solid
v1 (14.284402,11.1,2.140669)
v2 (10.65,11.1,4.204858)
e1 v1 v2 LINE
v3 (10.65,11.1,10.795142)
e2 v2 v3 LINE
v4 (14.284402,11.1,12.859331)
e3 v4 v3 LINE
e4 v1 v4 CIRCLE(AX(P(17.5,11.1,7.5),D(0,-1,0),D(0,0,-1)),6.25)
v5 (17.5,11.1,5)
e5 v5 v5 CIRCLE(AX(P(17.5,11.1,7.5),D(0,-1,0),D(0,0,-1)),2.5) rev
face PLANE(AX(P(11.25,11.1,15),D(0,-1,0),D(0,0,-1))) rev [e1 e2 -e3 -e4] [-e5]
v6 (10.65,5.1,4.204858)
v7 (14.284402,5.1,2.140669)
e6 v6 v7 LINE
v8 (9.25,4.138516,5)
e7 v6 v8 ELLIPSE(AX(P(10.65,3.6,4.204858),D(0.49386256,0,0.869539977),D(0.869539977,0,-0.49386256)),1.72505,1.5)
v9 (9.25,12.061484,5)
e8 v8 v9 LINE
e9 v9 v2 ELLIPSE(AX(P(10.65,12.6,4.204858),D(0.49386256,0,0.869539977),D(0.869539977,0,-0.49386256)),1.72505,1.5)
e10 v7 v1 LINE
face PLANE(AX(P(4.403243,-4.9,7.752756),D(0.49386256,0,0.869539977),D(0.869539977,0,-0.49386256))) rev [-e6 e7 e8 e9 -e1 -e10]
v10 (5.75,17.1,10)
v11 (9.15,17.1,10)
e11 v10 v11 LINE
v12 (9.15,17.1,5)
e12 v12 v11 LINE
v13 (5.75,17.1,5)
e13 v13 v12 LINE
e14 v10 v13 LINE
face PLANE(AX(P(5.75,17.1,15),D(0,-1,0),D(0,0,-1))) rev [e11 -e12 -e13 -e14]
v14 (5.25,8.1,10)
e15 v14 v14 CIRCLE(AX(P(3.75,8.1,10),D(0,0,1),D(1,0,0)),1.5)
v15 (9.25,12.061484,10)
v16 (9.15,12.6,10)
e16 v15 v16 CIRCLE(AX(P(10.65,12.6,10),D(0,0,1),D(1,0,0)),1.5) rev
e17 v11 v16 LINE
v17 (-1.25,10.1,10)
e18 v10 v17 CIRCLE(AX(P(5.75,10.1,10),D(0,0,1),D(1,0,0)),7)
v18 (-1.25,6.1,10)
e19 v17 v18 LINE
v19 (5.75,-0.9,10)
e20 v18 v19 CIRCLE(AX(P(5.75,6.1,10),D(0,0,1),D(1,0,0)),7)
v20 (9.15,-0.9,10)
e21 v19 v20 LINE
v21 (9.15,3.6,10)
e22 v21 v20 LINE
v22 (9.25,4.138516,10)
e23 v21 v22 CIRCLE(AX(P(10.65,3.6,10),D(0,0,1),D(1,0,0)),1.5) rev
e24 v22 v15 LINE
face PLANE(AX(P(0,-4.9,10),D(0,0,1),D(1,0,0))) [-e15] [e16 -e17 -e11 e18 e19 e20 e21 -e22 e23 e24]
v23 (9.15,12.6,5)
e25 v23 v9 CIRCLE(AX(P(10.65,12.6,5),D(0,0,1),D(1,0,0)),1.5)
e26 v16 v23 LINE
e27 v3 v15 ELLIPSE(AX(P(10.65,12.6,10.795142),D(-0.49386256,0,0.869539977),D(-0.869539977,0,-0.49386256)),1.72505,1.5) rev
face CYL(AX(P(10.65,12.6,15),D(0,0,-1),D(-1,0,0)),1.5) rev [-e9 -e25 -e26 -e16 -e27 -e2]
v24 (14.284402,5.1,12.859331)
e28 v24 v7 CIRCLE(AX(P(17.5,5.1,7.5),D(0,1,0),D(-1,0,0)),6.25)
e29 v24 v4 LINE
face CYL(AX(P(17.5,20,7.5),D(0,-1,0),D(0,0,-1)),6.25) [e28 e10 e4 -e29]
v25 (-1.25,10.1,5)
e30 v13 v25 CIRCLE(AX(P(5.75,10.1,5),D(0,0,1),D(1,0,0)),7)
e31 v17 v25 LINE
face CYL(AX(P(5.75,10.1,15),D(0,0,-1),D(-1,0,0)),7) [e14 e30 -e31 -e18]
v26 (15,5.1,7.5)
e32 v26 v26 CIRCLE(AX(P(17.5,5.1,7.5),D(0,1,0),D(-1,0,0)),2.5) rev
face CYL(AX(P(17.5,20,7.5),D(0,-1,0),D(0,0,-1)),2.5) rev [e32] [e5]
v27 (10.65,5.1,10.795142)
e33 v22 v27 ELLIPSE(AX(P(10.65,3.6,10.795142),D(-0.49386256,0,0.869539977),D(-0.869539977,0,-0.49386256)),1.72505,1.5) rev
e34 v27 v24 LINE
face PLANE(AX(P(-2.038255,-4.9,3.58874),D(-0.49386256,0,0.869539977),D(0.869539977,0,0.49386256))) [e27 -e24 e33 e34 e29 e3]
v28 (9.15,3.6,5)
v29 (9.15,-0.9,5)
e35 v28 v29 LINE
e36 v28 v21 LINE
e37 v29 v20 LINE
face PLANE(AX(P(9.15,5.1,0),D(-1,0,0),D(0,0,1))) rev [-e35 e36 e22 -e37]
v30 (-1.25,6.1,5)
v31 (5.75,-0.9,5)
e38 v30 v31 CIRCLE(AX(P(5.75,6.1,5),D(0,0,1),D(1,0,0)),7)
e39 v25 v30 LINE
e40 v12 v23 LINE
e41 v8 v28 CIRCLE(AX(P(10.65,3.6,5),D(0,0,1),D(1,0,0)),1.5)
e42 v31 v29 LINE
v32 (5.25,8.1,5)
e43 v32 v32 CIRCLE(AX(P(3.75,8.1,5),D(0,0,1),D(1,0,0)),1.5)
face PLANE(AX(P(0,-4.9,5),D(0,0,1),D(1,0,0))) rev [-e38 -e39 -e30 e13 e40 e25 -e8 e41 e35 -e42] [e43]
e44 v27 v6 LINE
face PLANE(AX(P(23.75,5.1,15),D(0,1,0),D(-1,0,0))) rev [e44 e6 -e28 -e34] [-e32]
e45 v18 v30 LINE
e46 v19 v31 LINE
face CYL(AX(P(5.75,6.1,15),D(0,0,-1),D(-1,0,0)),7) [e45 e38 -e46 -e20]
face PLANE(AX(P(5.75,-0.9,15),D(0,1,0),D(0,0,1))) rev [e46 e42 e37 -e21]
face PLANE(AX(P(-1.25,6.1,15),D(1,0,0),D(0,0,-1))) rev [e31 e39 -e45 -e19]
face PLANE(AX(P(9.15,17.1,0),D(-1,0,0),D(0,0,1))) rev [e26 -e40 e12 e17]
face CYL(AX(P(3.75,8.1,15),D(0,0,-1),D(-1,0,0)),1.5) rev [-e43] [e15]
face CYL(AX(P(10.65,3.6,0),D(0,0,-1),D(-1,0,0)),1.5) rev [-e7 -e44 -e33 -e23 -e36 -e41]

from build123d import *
from build123d.topology import SkipClean

# Parameters (mm, degrees)
CROQUIS1_R              = 1.5
SALIENTE_EXTRUIR1_DEPTH = 15
CROQUIS2_R              = 2.5
CORTAR_EXTRUIR1_DEPTH   = 20
CORTAR_EXTRUIR2_START   = -22
CORTAR_EXTRUIR2_DEPTH   = 22
CROQUIS4_W              = 2.1
CROQUIS4_H              = 6
CORTAR_EXTRUIR4_DEPTH   = 10
REDONDEO1_R             = 1.5


with BuildPart() as part:
    # Croquis1 → Saliente-Extruir1 (new body)
    with BuildSketch(Plane.XY):
        with BuildLine():
            Line((11.25, 17.1), (11.25, 11.1))
            Line((11.25, 11.1), (23.75, 11.1))
            Line((23.75, 11.1), (23.75, 5.1))
            Line((23.75, 5.1), (11.25, 5.1))
            Line((11.25, 5.1), (11.25, -0.9))
            Line((11.25, -0.9), (5.75, -0.9))
            ThreePointArc((5.75, -0.9), (0.800252532, 1.150252532), (-1.25, 6.1))
            Line((-1.25, 6.1), (-1.25, 10.1))
            ThreePointArc((-1.25, 10.1), (0.800252532, 15.049747468), (5.75, 17.1))
            Line((5.75, 17.1), (11.25, 17.1))
        make_face()
        with Locations((3.75, 8.1)):
            Circle(CROQUIS1_R, mode=Mode.SUBTRACT)
    extrude(amount=SALIENTE_EXTRUIR1_DEPTH)

    # Croquis2 → Cortar-Extruir1 (cut)
    with BuildSketch(Plane(origin=(0, 0, 0), x_dir=(1, 0, 0), z_dir=(0, 1, 0))):
        with Locations(Location((17.5, -7.5, 0), (0, 0, 90))):
            Circle(CROQUIS2_R)
        with BuildLine():
            Line((17.5, -1.25), (11.25, 0))
            Line((11.25, 0), (11.126279301, 1.868603497))
            Line((11.126279301, 1.868603497), (29.663453957, 1.868603497))
            Line((29.663453957, 1.868603497), (29.663453957, -17.961269996))
            Line((29.663453957, -17.961269996), (11.25, -17.961269996))
            Line((11.25, -17.961269996), (11.25, -15))
            Line((11.25, -15), (17.5, -13.75))
            ThreePointArc((17.5, -13.75), (23.75, -7.5), (17.5, -1.25))
        make_face()
    extrude(amount=CORTAR_EXTRUIR1_DEPTH, mode=Mode.SUBTRACT)

    # Croquis3 → Cortar-Extruir2 (cut)
    with SkipClean():  # the faces are left unmerged after this step: merging them gives an invalid solid
        with BuildSketch(Plane(origin=(0, 17.1, 0), x_dir=(1, 0, 0), z_dir=(0, 1, 0)).offset(CORTAR_EXTRUIR2_START)):
            with BuildLine():
                Line((-4.130088798, -10), (9.25, -10))
                Line((9.25, -10), (14.284401529, -12.859330786))
                ThreePointArc((14.284401529, -12.859330786), (15.831665113, -13.523218301), (17.5, -13.75))
                Line((17.5, -13.75), (17.5, -15.581395259))
                Line((17.5, -15.581395259), (-4.130088798, -15.581395259))
                Line((-4.130088798, -15.581395259), (-4.130088798, -10))
            make_face()
            with BuildLine():
                Line((-3.464792336, -5), (9.25, -5))
                Line((9.25, -5), (14.284401529, -2.140669214))
                ThreePointArc((14.284401529, -2.140669214), (15.831665113, -1.476781699), (17.5, -1.25))
                Line((17.5, -1.25), (17.5, 1.677177667))
                Line((17.5, 1.677177667), (-3.464792336, 1.677177667))
                Line((-3.464792336, 1.677177667), (-3.464792336, -5))
            make_face()
        extrude(amount=CORTAR_EXTRUIR2_DEPTH, mode=Mode.SUBTRACT)

    # Croquis4 → Cortar-Extruir4 (cut, symmetric)
    with SkipClean():  # the faces are left unmerged after this step: merging them gives an invalid solid
        with BuildSketch(Plane.XY.offset(10)):
            with Locations((10.2, 14.1)):
                Rectangle(CROQUIS4_W, CROQUIS4_H)
            with Locations((10.2, 2.1)):
                Rectangle(CROQUIS4_W, CROQUIS4_H)
        extrude(amount=CORTAR_EXTRUIR4_DEPTH, both=True, mode=Mode.SUBTRACT)

    # Redondeo1
    # the kernel refuses this fillet: 1.5 mm, written as the material it adds along each edge
    with BuildSketch(Plane(origin=(9.15, 5.1, 1.25), x_dir=(0, -1, 0), z_dir=(0, 0, 1))) as redondeo1_piece_1_section:
        with BuildLine():
            CenterArc((REDONDEO1_R, REDONDEO1_R), REDONDEO1_R, 180, 90)
            Line((0, REDONDEO1_R), (0, 0))
            Line((0, 0), (REDONDEO1_R, 0))
        make_face()
    redondeo1_piece_1 = extrude(amount=8.75, mode=Mode.PRIVATE)
    redondeo1_piece_1 = split(redondeo1_piece_1, bisect_by=Plane(origin=(9.866987005, 4.973706672, 5), z_dir=(0, 0, -1)), keep=Keep.TOP, mode=Mode.PRIVATE)
    redondeo1_piece_1 = split(redondeo1_piece_1, bisect_by=Plane(origin=(9.791745369, 4.973706672, 4.692311151), z_dir=(0.49386255985599625, 0, 0.8695399772135164)), keep=Keep.TOP, mode=Mode.PRIVATE)
    add(redondeo1_piece_1)
    with BuildSketch(Plane(origin=(9.15, 5.1, 5), x_dir=(0, -1, 0), z_dir=(0, 0, 1))) as redondeo1_piece_2_section:
        with BuildLine():
            CenterArc((REDONDEO1_R, REDONDEO1_R), REDONDEO1_R, 180, 90)
            Line((0, REDONDEO1_R), (0, 0))
            Line((0, 0), (REDONDEO1_R, 0))
        make_face()
    redondeo1_piece_2 = extrude(amount=5, mode=Mode.PRIVATE)
    redondeo1_piece_2 = split(redondeo1_piece_2, bisect_by=Plane(origin=(9.170637547, 4.440228568, 5.045074574), z_dir=(-0.49386255985599625, 0, -0.8695399772135164)), keep=Keep.TOP, mode=Mode.PRIVATE)
    add(redondeo1_piece_2)
    with BuildSketch(Plane(origin=(9.15, 5.1, 5), x_dir=(0, -1, 0), z_dir=(0, 0, 1))) as redondeo1_piece_3_section:
        with BuildLine():
            CenterArc((REDONDEO1_R, REDONDEO1_R), REDONDEO1_R, 180, 90)
            Line((0, REDONDEO1_R), (0, 0))
            Line((0, 0), (REDONDEO1_R, 0))
        make_face()
    redondeo1_piece_3 = extrude(amount=5, mode=Mode.PRIVATE)
    redondeo1_piece_3 = split(redondeo1_piece_3, bisect_by=Plane(origin=(8.358711998, 4.761869179, 9.493785466), z_dir=(0.49386255985599636, 0, -0.8695399772135163)), keep=Keep.TOP, mode=Mode.PRIVATE)
    redondeo1_piece_3 = split(redondeo1_piece_3, bisect_by=Plane(origin=(8.358711998, 4.761869179, 5.506214534), z_dir=(0.49386255985599625, 0, 0.8695399772135164)), keep=Keep.TOP, mode=Mode.PRIVATE)
    add(redondeo1_piece_3)
    with BuildSketch(Plane(origin=(9.15, 5.1, 5), x_dir=(0, -1, 0), z_dir=(0, 0, 1))) as redondeo1_piece_4_section:
        with BuildLine():
            CenterArc((REDONDEO1_R, REDONDEO1_R), REDONDEO1_R, 180, 90)
            Line((0, REDONDEO1_R), (0, 0))
            Line((0, 0), (REDONDEO1_R, 0))
        make_face()
    redondeo1_piece_4 = extrude(amount=8.75, mode=Mode.PRIVATE)
    redondeo1_piece_4 = split(redondeo1_piece_4, bisect_by=Plane(origin=(9.866987005, 4.973706672, 10), z_dir=(0, 0, 1)), keep=Keep.TOP, mode=Mode.PRIVATE)
    redondeo1_piece_4 = split(redondeo1_piece_4, bisect_by=Plane(origin=(9.791745369, 4.973706672, 10.307688849), z_dir=(0.49386255985599636, 0, -0.8695399772135163)), keep=Keep.TOP, mode=Mode.PRIVATE)
    add(redondeo1_piece_4)
    with BuildSketch(Plane(origin=(9.15, 5.1, 5), x_dir=(0, -1, 0), z_dir=(0, 0, 1))) as redondeo1_piece_5_section:
        with BuildLine():
            CenterArc((REDONDEO1_R, REDONDEO1_R), REDONDEO1_R, 180, 90)
            Line((0, REDONDEO1_R), (0, 0))
            Line((0, 0), (REDONDEO1_R, 0))
        make_face()
    redondeo1_piece_5 = extrude(amount=5, mode=Mode.PRIVATE)
    redondeo1_piece_5 = split(redondeo1_piece_5, bisect_by=Plane(origin=(9.170637547, 4.440228568, 9.954925426), z_dir=(-0.49386255985599636, 0, 0.8695399772135163)), keep=Keep.TOP, mode=Mode.PRIVATE)
    add(redondeo1_piece_5)
    with BuildSketch(Plane(origin=(9.15, 11.1, 5), x_dir=(1, 0, 0), z_dir=(0, 0, 1))) as redondeo1_piece_6_section:
        with BuildLine():
            CenterArc((REDONDEO1_R, REDONDEO1_R), REDONDEO1_R, 180, 90)
            Line((0, REDONDEO1_R), (0, 0))
            Line((0, 0), (REDONDEO1_R, 0))
        make_face()
    redondeo1_piece_6 = extrude(amount=5, mode=Mode.PRIVATE)
    redondeo1_piece_6 = split(redondeo1_piece_6, bisect_by=Plane(origin=(9.17063755, 11.759771469, 5.045074573), z_dir=(-0.49386255985599625, 0, -0.8695399772135164)), keep=Keep.TOP, mode=Mode.PRIVATE)
    add(redondeo1_piece_6)
    with BuildSketch(Plane(origin=(9.15, 11.1, 1.25), x_dir=(1, 0, 0), z_dir=(0, 0, 1))) as redondeo1_piece_7_section:
        with BuildLine():
            CenterArc((REDONDEO1_R, REDONDEO1_R), REDONDEO1_R, 180, 90)
            Line((0, REDONDEO1_R), (0, 0))
            Line((0, 0), (REDONDEO1_R, 0))
        make_face()
    redondeo1_piece_7 = extrude(amount=8.75, mode=Mode.PRIVATE)
    redondeo1_piece_7 = split(redondeo1_piece_7, bisect_by=Plane(origin=(9.866987013, 11.226293308, 5), z_dir=(0, 0, -1)), keep=Keep.TOP, mode=Mode.PRIVATE)
    redondeo1_piece_7 = split(redondeo1_piece_7, bisect_by=Plane(origin=(9.791745378, 11.226293308, 4.692311146), z_dir=(0.49386255985599625, 0, 0.8695399772135164)), keep=Keep.TOP, mode=Mode.PRIVATE)
    add(redondeo1_piece_7)
    with BuildSketch(Plane(origin=(9.15, 11.1, 5), x_dir=(1, 0, 0), z_dir=(0, 0, 1))) as redondeo1_piece_8_section:
        with BuildLine():
            CenterArc((REDONDEO1_R, REDONDEO1_R), REDONDEO1_R, 180, 90)
            Line((0, REDONDEO1_R), (0, 0))
            Line((0, 0), (REDONDEO1_R, 0))
        make_face()
    redondeo1_piece_8 = extrude(amount=5, mode=Mode.PRIVATE)
    redondeo1_piece_8 = split(redondeo1_piece_8, bisect_by=Plane(origin=(8.358711999, 11.438130822, 5.506214534), z_dir=(0.49386255985599625, 0, 0.8695399772135164)), keep=Keep.TOP, mode=Mode.PRIVATE)
    redondeo1_piece_8 = split(redondeo1_piece_8, bisect_by=Plane(origin=(8.358711999, 11.438130822, 9.493785466), z_dir=(0.49386255985599636, 0, -0.8695399772135163)), keep=Keep.TOP, mode=Mode.PRIVATE)
    add(redondeo1_piece_8)
    with BuildSketch(Plane(origin=(9.15, 11.1, 5), x_dir=(1, 0, 0), z_dir=(0, 0, 1))) as redondeo1_piece_9_section:
        with BuildLine():
            CenterArc((REDONDEO1_R, REDONDEO1_R), REDONDEO1_R, 180, 90)
            Line((0, REDONDEO1_R), (0, 0))
            Line((0, 0), (REDONDEO1_R, 0))
        make_face()
    redondeo1_piece_9 = extrude(amount=5, mode=Mode.PRIVATE)
    redondeo1_piece_9 = split(redondeo1_piece_9, bisect_by=Plane(origin=(9.17063755, 11.759771469, 9.954925427), z_dir=(-0.49386255985599636, 0, 0.8695399772135163)), keep=Keep.TOP, mode=Mode.PRIVATE)
    add(redondeo1_piece_9)
    with BuildSketch(Plane(origin=(9.15, 11.1, 5), x_dir=(1, 0, 0), z_dir=(0, 0, 1))) as redondeo1_piece_10_section:
        with BuildLine():
            CenterArc((REDONDEO1_R, REDONDEO1_R), REDONDEO1_R, 180, 90)
            Line((0, REDONDEO1_R), (0, 0))
            Line((0, 0), (REDONDEO1_R, 0))
        make_face()
    redondeo1_piece_10 = extrude(amount=8.75, mode=Mode.PRIVATE)
    redondeo1_piece_10 = split(redondeo1_piece_10, bisect_by=Plane(origin=(9.866987013, 11.226293308, 10), z_dir=(0, 0, 1)), keep=Keep.TOP, mode=Mode.PRIVATE)
    redondeo1_piece_10 = split(redondeo1_piece_10, bisect_by=Plane(origin=(9.791745378, 11.226293308, 10.307688854), z_dir=(0.49386255985599636, 0, -0.8695399772135163)), keep=Keep.TOP, mode=Mode.PRIVATE)
    add(redondeo1_piece_10)


solid = part.part
